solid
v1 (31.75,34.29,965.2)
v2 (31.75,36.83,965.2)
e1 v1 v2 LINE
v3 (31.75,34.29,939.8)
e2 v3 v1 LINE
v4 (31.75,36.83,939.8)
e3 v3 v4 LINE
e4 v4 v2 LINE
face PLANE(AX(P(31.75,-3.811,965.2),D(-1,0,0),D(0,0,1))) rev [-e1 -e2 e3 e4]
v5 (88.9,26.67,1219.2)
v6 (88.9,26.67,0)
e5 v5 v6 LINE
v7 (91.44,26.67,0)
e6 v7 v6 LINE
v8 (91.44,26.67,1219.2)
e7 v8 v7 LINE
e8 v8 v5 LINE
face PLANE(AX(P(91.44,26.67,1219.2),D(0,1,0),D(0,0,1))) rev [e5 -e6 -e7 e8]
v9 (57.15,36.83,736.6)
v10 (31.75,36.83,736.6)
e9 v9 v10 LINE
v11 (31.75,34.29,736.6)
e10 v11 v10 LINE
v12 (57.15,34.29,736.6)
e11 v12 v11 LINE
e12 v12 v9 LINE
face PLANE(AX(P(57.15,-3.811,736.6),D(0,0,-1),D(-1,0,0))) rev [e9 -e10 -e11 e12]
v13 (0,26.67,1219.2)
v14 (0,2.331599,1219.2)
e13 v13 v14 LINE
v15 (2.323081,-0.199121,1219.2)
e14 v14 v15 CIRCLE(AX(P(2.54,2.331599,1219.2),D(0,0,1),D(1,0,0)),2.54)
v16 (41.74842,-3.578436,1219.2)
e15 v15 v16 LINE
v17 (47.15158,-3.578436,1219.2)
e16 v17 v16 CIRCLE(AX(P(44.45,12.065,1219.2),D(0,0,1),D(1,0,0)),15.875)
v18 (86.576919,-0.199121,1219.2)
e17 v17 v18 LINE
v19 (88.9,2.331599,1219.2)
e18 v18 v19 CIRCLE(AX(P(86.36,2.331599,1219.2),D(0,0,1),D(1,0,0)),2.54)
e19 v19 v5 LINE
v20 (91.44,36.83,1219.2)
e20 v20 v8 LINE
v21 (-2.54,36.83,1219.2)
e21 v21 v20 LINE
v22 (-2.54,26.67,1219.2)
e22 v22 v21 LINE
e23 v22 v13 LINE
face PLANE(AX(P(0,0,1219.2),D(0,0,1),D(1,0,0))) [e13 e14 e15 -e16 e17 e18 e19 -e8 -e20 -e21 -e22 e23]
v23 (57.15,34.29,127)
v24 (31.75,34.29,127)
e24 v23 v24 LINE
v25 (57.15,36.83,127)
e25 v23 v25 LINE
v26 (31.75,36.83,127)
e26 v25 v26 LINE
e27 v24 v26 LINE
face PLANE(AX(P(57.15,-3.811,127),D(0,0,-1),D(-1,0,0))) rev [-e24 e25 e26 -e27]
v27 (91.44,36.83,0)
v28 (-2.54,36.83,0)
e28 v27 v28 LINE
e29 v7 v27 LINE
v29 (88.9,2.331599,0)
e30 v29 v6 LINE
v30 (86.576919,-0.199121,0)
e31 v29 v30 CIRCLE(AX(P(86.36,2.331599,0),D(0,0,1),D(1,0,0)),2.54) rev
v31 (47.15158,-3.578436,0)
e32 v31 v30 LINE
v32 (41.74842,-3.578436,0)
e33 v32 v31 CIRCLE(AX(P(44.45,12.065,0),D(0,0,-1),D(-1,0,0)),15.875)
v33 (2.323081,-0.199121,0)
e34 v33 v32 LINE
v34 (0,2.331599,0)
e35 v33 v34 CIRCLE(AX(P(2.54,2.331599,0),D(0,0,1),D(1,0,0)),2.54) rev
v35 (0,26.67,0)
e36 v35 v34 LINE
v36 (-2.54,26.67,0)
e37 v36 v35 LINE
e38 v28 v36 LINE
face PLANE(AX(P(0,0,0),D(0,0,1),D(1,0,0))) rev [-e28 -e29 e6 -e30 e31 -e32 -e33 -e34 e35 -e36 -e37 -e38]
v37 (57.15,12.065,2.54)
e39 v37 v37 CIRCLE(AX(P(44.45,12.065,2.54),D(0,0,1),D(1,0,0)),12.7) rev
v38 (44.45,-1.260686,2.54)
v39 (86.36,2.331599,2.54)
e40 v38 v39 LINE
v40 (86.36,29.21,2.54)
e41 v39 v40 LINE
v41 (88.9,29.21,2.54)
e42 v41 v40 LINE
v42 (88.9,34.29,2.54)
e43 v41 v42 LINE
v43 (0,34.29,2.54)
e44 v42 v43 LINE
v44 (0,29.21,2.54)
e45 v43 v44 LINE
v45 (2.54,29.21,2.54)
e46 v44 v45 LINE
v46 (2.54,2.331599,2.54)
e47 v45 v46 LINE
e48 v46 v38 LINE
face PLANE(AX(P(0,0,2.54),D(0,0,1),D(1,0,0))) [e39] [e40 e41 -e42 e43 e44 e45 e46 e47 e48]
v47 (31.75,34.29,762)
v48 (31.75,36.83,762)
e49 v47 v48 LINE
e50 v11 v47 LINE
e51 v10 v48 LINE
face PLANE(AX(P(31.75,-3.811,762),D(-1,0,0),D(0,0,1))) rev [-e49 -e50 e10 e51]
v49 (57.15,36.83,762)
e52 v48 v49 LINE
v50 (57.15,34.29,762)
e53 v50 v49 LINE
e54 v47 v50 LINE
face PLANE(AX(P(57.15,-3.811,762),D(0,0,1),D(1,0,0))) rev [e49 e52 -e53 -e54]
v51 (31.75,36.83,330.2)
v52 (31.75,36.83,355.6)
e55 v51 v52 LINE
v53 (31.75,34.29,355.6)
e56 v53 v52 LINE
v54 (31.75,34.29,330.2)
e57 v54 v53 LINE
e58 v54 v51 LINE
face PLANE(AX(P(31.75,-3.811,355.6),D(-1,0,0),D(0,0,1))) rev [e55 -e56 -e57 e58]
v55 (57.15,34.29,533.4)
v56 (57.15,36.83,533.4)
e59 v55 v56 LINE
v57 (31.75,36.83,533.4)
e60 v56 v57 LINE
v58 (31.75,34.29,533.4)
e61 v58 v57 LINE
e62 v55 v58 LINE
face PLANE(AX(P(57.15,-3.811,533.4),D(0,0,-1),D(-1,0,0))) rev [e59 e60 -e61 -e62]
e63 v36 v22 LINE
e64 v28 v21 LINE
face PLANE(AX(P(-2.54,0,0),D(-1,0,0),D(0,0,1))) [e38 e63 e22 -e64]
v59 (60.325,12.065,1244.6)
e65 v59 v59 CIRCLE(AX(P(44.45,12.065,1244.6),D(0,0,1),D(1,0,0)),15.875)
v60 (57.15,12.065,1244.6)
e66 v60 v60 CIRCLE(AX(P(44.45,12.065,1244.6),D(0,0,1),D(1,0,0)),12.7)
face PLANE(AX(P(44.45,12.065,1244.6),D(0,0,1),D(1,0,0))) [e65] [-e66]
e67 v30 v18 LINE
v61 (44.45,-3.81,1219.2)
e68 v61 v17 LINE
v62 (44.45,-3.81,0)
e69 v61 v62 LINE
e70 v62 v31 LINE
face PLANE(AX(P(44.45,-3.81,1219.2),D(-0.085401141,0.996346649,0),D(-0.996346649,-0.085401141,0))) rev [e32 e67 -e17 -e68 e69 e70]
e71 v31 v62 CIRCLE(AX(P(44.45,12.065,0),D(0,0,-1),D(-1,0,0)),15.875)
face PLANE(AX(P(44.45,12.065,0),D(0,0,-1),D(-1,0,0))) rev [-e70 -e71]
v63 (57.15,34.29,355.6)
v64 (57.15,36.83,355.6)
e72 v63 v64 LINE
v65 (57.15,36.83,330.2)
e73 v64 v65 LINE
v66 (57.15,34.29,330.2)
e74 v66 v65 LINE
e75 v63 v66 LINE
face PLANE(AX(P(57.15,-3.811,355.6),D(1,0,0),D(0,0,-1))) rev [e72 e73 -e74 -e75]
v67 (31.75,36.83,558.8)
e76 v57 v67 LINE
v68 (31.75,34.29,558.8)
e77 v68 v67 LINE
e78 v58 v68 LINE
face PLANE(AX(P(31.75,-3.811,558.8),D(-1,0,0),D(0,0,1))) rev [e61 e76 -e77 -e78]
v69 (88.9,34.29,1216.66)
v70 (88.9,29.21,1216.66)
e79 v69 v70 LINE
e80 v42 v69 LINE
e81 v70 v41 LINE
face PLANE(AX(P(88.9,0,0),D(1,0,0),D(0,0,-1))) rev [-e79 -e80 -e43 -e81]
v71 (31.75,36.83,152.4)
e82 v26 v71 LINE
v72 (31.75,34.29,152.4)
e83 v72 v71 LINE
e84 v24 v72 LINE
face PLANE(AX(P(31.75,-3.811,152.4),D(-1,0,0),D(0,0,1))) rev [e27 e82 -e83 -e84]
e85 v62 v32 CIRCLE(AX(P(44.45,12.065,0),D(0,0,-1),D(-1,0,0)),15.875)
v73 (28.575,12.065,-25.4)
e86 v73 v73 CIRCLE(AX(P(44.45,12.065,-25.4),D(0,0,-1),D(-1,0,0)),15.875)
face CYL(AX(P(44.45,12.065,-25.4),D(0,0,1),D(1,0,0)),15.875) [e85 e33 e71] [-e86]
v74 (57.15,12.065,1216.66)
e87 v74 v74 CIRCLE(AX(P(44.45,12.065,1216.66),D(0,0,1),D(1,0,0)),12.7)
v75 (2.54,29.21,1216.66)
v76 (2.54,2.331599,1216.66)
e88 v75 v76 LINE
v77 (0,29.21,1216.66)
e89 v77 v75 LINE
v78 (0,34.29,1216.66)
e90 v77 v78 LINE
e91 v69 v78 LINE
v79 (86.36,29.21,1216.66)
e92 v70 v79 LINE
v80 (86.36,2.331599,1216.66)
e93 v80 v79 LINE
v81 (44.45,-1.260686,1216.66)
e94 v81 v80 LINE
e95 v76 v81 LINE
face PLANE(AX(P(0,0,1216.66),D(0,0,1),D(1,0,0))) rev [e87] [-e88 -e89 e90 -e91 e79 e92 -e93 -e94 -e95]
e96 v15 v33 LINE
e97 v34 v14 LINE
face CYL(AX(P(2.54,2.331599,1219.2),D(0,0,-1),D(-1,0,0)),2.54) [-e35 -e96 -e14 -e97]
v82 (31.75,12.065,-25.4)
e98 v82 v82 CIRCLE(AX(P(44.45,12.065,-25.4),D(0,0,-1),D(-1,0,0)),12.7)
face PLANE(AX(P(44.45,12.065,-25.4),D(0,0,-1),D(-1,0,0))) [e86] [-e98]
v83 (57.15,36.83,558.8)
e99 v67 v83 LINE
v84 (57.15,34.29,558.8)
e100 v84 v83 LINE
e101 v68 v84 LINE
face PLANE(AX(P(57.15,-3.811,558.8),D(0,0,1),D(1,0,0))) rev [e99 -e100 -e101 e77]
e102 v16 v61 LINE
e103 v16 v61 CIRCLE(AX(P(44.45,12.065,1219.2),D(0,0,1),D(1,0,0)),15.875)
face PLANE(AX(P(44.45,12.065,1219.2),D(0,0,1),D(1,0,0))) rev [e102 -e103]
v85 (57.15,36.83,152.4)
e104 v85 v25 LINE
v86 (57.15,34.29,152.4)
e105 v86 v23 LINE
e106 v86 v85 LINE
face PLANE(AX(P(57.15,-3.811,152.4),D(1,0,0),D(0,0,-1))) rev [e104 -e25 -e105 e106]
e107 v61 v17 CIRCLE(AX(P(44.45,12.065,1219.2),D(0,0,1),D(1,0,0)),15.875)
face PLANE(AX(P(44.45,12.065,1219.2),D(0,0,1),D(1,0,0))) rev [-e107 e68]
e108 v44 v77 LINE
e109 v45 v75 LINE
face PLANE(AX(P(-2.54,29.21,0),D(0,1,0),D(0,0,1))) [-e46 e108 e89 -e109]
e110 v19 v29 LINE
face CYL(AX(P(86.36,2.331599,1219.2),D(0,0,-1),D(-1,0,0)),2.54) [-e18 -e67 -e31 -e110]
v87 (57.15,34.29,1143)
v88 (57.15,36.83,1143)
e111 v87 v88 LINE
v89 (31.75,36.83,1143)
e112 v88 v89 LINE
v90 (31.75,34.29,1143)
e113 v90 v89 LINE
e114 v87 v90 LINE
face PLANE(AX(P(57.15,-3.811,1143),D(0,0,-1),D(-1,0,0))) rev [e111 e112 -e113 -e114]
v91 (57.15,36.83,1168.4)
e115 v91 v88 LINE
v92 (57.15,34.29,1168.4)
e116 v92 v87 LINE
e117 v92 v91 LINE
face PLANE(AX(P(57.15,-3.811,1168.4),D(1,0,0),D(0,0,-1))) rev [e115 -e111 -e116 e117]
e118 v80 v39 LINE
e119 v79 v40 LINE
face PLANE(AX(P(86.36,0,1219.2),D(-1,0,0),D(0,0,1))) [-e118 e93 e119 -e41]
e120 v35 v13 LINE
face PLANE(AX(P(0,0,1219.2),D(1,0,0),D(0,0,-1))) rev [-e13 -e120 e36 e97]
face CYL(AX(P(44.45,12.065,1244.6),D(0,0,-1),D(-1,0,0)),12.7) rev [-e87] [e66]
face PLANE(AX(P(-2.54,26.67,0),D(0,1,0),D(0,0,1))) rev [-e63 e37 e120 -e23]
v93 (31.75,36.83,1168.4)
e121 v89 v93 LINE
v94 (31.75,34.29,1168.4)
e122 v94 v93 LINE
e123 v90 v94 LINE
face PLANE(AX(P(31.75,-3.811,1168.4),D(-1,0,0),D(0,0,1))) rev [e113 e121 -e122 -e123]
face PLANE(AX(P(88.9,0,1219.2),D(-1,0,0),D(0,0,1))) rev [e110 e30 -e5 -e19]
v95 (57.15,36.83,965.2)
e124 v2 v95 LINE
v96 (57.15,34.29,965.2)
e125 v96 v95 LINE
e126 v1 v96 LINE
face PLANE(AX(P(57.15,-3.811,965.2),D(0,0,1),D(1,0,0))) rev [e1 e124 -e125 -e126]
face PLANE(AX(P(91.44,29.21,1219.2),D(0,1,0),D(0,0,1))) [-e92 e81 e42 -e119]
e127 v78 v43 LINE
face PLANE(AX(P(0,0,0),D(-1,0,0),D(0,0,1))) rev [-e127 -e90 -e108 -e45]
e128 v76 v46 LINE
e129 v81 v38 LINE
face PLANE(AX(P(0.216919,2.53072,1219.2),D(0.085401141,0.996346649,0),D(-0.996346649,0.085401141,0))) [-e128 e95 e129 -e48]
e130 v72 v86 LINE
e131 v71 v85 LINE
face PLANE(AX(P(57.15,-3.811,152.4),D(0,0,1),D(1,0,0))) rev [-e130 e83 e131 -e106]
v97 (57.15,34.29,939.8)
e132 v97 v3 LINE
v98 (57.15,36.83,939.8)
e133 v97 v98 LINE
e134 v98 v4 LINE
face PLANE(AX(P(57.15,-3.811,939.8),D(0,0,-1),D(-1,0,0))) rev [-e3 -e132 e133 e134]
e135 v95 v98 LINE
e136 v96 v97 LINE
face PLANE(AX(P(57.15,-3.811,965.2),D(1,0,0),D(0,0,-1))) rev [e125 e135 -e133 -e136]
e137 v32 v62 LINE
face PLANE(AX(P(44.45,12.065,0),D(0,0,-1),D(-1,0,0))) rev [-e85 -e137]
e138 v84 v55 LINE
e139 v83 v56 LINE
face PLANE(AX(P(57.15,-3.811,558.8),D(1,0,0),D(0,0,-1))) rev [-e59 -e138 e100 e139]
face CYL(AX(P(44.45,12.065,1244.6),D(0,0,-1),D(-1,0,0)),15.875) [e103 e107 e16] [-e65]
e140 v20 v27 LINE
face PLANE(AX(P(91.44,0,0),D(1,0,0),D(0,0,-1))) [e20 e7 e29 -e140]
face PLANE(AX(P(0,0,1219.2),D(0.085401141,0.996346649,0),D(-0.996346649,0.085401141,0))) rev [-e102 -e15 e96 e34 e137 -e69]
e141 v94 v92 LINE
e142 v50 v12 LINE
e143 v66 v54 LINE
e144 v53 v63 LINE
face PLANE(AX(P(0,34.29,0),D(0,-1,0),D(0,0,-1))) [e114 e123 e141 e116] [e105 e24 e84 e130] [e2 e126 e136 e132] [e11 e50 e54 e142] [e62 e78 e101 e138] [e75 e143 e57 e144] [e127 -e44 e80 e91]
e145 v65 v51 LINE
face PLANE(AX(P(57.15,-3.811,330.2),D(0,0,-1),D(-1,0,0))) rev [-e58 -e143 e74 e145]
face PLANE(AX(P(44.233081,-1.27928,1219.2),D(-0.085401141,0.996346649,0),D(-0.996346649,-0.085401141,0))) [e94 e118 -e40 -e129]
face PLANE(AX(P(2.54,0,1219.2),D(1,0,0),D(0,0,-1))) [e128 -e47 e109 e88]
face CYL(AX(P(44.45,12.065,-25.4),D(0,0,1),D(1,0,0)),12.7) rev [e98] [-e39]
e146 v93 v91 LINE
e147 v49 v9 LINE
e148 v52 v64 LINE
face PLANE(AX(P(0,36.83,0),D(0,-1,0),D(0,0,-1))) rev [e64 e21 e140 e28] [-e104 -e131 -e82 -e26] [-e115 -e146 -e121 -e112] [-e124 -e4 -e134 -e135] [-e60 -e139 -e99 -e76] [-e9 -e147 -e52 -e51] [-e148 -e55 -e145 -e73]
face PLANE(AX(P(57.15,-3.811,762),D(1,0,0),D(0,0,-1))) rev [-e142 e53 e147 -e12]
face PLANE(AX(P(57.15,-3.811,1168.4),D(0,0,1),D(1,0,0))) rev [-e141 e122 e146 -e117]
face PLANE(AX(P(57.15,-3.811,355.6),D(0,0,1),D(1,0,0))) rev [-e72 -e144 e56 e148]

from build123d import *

# Parameters (mm, degrees)
BOSS_EXTRUDE1_DEPTH    = 1219.2
SKETCH2_W              = 1219.2
SKETCH2_H              = 7.62
BOSS_EXTRUDE2_DEPTH    = 2.54
SKETCH3_W              = 1219.2
SKETCH3_H              = 7.62
BOSS_EXTRUDE3_DEPTH    = 2.54
SKETCH4_R              = 15.875
SKETCH4_R_2            = 12.7
BOSS_EXTRUDE4_DEPTH    = 25.4
BOSS_EXTRUDE5_START    = 25.4
SKETCH6_R              = 15.875
SKETCH6_R_2            = 12.7
BOSS_EXTRUDE5_DEPTH    = 25.4
SHELL2_START           = 2.54
SHELL2_DEPTH           = 1214.12
SKETCH9_W              = 93.98
SKETCH9_H              = 1219.2
BOSS_EXTRUDE7_DEPTH    = 2.54
FILLET1_R              = 2.54
CUT_EXTRUDE3_START     = -2.54
CUT_EXTRUDE3_OUTLINE_R = 12.7
CUT_EXTRUDE3_DEPTH     = 2.54
SKETCH11_R             = 12.7
CUT_EXTRUDE4_DEPTH     = 2.54
CUT_EXTRUDE5_REACH     = 1250.616
SKETCH12_W             = 25.4
SKETCH12_H             = 25.4
LPATTERN1_COUNT        = 6
LPATTERN1_PITCH        = 203.2


# Read off the part's stored shape, not the designer's step: Shell2, Cut-Extrude3
with BuildPart() as part:
    # Sketch1 → Boss-Extrude1 (new body)
    with BuildSketch(Plane.XY):
        Polygon((0, 0), (0, 34.29), (88.9, 34.29), (88.9, 0), (44.45, -3.81), align=None)
    extrude(amount=BOSS_EXTRUDE1_DEPTH)

    # Sketch2 → Boss-Extrude2 (add)
    with BuildSketch(Plane(origin=(88.9, 0, 0), x_dir=(0, 0, -1), z_dir=(1, 0, 0))):
        with Locations((-609.6, 30.48)):
            Rectangle(SKETCH2_W, SKETCH2_H)
    extrude(amount=BOSS_EXTRUDE2_DEPTH)

    # Sketch3 → Boss-Extrude3 (add)
    with BuildSketch(Plane.ZY):
        with Locations((609.6, 30.48)):
            Rectangle(SKETCH3_W, SKETCH3_H)
    extrude(amount=BOSS_EXTRUDE3_DEPTH)

    # Sketch4 → Boss-Extrude4 (add)
    with BuildSketch(Plane(origin=(0, 0, 0), x_dir=(-1, 0, 0), z_dir=(0, 0, -1))):
        with Locations(Location((-44.45, 12.065, 0), (0, 0, 260.201815092))):
            Circle(SKETCH4_R)
        with Locations((-44.45, 12.065)):
            Circle(SKETCH4_R_2, mode=Mode.SUBTRACT)
    extrude(amount=BOSS_EXTRUDE4_DEPTH)

    # Sketch6 → Boss-Extrude5 (add)
    with BuildSketch(Plane.XY.offset(1219.2).offset(BOSS_EXTRUDE5_START)):
        with Locations(Location((44.45, 12.065, 0), (0, 0, 279.798184908))):
            Circle(SKETCH6_R)
        with Locations(Location((44.45, 12.065, 0), (0, 0, 180))):
            Circle(SKETCH6_R_2, mode=Mode.SUBTRACT)
    extrude(amount=-BOSS_EXTRUDE5_DEPTH)

    # Shell2 outline → Shell2 (cut)
    with BuildSketch(Plane.XY.offset(SHELL2_START)):
        Polygon((44.45, -1.260686463), (86.36, 2.331599251), (86.36, 29.21), (88.9, 29.21), (88.9, 34.29), (0, 34.29), (0, 29.21), (2.54, 29.21), (2.54, 2.331599251), align=None)
    extrude(amount=SHELL2_DEPTH, mode=Mode.SUBTRACT)

    # Sketch9 → Boss-Extrude7 (add)
    with BuildSketch(Plane(origin=(0, 34.29, 0), x_dir=(1, 0, 0), z_dir=(0, 1, 0))):
        with Locations((44.45, -609.6)):
            Rectangle(SKETCH9_W, SKETCH9_H)
    extrude(amount=BOSS_EXTRUDE7_DEPTH)

    # Fillet1
    fillet1_edges = [part.edges().sort_by_distance(p)[0] for p in [
        (0, 0, 609.6),
        (88.9, 0, 609.6),
    ]]
    fillet(fillet1_edges, radius=FILLET1_R)

    # Cut-Extrude3 outline → Cut-Extrude3 (cut)
    with BuildSketch(Plane(origin=(0, 0, 0), x_dir=(-1, 0, 0), z_dir=(0, 0, -1)).offset(CUT_EXTRUDE3_START)):
        with Locations((-44.45, 12.065)):
            Circle(CUT_EXTRUDE3_OUTLINE_R)
    extrude(amount=CUT_EXTRUDE3_DEPTH, mode=Mode.SUBTRACT)

    # Sketch11 → Cut-Extrude4 (cut)
    with BuildSketch(Plane.XY.offset(1219.2)):
        with Locations((44.45, 12.065)):
            Circle(SKETCH11_R)
    extrude(amount=-CUT_EXTRUDE4_DEPTH, mode=Mode.SUBTRACT)

    # Sketch12 → Cut-Extrude5 (cut, up to next)
    with BuildSketch(Plane(origin=(0, 36.83, 0), x_dir=(1, 0, 0), z_dir=(0, 1, 0)), mode=Mode.PRIVATE) as cut_extrude5_sk1:
        with Locations((44.45, -1155.7)):
            Rectangle(SKETCH12_W, SKETCH12_H)
    cut_extrude5_tool1 = extrude(cut_extrude5_sk1.sketch, amount=-CUT_EXTRUDE5_REACH, mode=Mode.PRIVATE) & part.part
    cut_extrude5 = cut_extrude5_tool1.solids().sort_by_distance((44.45, 36.83, 1155.7))[0]
    add(cut_extrude5, mode=Mode.SUBTRACT)

    # LPattern1: Cut-Extrude5 ×6
    with Locations(*[(0, 0, -i * LPATTERN1_PITCH) for i in range(1, LPATTERN1_COUNT)]):
        add(cut_extrude5, mode=Mode.SUBTRACT)


solid = part.part
